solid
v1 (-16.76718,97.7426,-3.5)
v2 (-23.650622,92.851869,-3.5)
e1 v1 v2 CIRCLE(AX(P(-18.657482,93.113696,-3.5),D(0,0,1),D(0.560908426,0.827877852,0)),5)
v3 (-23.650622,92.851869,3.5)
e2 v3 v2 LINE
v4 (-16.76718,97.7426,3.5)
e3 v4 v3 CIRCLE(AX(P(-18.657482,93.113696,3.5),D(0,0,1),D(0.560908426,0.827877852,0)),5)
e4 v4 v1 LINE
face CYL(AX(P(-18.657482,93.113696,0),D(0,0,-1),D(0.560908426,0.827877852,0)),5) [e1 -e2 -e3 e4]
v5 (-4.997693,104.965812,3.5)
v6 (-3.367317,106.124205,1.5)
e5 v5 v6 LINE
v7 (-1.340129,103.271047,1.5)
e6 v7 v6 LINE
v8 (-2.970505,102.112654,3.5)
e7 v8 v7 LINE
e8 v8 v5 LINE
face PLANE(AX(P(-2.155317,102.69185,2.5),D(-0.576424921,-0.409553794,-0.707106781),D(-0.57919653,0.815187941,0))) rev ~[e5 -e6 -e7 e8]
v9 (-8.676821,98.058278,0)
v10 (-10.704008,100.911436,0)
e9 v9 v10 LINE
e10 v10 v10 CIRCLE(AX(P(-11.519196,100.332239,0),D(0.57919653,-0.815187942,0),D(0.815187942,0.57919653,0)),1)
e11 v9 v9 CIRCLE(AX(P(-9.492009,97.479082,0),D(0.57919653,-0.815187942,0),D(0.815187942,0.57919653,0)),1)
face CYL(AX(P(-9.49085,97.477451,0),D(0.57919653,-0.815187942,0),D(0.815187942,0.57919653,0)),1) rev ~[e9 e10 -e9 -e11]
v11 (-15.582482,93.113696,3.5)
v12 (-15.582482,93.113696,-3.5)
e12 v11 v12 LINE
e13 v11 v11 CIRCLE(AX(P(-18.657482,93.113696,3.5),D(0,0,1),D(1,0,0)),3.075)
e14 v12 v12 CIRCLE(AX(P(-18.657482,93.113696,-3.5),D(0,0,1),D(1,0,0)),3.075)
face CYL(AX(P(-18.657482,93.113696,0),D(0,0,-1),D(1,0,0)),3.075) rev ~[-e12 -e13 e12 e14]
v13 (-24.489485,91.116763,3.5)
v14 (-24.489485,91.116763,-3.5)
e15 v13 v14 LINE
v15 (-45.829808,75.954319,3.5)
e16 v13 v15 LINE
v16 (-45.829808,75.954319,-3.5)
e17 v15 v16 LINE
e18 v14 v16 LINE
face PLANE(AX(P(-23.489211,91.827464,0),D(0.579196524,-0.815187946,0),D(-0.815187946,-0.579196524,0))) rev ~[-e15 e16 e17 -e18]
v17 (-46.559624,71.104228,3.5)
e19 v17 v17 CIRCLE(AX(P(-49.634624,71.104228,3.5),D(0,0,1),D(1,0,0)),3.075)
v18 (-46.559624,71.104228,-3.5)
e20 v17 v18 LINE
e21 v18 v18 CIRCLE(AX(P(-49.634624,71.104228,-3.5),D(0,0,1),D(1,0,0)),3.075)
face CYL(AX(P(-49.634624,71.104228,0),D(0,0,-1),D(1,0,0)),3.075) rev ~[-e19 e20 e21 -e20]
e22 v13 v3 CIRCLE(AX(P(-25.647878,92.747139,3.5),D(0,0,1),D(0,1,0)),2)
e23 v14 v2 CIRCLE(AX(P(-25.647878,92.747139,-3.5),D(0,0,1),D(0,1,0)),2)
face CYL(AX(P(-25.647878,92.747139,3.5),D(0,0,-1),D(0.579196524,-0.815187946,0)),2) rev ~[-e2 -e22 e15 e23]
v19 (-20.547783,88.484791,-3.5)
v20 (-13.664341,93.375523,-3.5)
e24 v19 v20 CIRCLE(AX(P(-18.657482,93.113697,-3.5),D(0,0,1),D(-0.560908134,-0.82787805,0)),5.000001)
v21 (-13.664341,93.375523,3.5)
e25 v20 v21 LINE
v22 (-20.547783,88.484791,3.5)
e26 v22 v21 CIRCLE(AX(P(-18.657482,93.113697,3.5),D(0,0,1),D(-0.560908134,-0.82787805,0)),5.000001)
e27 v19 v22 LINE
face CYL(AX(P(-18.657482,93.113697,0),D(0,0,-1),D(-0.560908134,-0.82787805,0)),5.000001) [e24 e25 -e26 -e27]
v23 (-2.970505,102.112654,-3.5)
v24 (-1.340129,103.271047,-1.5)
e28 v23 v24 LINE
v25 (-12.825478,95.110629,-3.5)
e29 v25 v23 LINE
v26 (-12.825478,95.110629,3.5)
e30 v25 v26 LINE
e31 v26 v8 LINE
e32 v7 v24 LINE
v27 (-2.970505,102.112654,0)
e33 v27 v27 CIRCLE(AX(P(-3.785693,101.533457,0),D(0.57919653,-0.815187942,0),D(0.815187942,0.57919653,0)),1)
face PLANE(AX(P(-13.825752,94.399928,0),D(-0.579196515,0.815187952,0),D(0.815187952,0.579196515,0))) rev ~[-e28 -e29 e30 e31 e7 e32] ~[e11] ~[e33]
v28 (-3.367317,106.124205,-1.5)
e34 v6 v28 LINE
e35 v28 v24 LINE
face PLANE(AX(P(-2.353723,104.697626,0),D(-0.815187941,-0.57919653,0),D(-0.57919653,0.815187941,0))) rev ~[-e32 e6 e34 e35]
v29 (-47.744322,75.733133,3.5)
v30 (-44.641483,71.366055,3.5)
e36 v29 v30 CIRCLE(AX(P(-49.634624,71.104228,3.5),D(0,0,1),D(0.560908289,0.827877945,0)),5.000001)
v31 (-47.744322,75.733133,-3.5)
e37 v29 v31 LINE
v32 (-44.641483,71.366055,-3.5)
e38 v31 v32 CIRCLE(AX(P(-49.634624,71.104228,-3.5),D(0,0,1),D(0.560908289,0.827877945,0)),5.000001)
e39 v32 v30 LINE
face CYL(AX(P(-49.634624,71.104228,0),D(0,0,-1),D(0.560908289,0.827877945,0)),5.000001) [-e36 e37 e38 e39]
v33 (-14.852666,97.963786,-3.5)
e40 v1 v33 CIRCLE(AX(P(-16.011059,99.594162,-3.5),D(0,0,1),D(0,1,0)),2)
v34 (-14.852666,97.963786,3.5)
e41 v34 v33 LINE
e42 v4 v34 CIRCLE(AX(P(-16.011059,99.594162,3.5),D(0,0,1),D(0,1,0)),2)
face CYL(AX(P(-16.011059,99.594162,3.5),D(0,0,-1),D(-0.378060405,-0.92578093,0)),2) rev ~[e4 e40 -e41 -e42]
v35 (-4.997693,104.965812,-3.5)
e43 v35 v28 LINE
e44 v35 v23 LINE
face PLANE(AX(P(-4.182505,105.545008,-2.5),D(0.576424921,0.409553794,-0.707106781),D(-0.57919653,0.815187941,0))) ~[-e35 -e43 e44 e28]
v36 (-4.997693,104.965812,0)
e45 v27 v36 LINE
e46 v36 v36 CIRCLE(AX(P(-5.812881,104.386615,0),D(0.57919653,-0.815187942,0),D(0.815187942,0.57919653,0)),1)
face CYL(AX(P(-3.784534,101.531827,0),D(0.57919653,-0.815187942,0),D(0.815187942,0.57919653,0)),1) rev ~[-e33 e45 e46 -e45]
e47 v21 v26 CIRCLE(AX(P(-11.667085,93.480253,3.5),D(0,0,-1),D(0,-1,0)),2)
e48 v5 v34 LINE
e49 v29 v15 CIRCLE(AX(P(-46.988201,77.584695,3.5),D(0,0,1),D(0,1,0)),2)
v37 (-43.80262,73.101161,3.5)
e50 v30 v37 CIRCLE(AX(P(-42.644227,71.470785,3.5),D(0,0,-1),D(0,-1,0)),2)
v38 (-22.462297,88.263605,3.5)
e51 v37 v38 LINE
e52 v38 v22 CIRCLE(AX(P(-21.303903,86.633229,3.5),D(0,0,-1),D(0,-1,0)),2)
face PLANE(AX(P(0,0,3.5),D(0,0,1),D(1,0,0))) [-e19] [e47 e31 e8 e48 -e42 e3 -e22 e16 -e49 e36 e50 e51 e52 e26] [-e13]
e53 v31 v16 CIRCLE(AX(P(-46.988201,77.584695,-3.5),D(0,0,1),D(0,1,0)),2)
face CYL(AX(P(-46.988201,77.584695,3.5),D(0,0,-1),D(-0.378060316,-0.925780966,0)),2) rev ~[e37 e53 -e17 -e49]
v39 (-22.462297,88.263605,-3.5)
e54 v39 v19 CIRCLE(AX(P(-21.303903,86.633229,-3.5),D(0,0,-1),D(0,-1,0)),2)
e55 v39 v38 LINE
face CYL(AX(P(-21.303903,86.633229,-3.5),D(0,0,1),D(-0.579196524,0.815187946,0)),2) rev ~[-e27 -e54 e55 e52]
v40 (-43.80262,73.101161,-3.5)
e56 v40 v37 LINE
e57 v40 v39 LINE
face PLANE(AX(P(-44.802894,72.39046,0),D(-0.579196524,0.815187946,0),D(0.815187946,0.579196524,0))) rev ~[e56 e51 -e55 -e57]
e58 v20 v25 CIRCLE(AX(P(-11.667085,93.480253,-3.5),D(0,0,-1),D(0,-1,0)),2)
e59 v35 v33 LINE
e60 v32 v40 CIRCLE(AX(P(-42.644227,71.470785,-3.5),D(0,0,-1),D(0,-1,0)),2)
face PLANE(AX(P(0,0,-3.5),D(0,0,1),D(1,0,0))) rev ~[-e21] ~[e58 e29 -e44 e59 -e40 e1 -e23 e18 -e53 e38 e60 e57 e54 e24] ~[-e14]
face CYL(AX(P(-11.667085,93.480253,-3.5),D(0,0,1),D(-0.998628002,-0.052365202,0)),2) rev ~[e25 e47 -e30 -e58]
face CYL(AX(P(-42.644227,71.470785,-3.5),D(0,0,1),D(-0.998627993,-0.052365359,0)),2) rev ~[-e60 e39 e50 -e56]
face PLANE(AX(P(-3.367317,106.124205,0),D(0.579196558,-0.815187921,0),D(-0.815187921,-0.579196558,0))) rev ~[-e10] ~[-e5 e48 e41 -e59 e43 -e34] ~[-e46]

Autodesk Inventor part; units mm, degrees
ref_plane "YZ Plane" through (0, 0, 0) normal (1, 0, 0) x (0, 1, 0)
ref_plane "XZ Plane" through (0, 0, 0) normal (0, 1, 0) x (-1, 0, 0)
ref_plane "XY Plane" through (0, 0, 0) normal (0, 0, 1) x (1, 0, 0)
sketch "Sketch1" plane through (0, 0, 0) normal (0, 0, 1) x (1, 0, 0)
  line L0 (-49.634624, 71.104228) -> (-18.657482, 93.113696)
  circle A0 centre (-49.634624, 71.104228) radius 5
  circle A1 centre (-18.657482, 93.113696) radius 5
  circle A2 centre (-49.634624, 71.104228) radius 3.075
  circle A3 centre (-18.657482, 93.113696) radius 3.075
  line L1 (-49.634624, 71.104228) -> (-18.657482, 93.113696) construction
  line L2 (-48.62103, 69.677649) -> (-17.643888, 91.687117)
  line L3 (-19.671076, 94.540275) -> (-50.648218, 72.530807)
  arc A4 (-50.648218, 72.530807) -> (-48.62103, 69.677649) centre (-49.634624, 71.104228) ccw
  arc A5 (-17.643888, 91.687117) -> (-19.671076, 94.540275) centre (-18.657482, 93.113696) ccw
  line L4 (-18.657482, 93.113696) -> (-2.353723, 104.697626) construction
  line L5 (-17.643888, 91.687117) -> (-1.340129, 103.271047)
  line L6 (-3.367317, 106.124205) -> (-19.671076, 94.540275)
  arc A6 (-19.671076, 94.540275) -> (-17.643888, 91.687117) centre (-18.657482, 93.113696) ccw
  arc A7 (-1.340129, 103.271047) -> (-3.367317, 106.124205) centre (-2.353723, 104.697626) ccw
  line L7 (-2.353723, 104.697626) -> (-3.367317, 106.124205)
  line L8 (-2.353723, 104.697626) -> (-1.340129, 103.271047)
  point P0 (0, 0)
  point P1 (-34.146053, 82.108962)
  point P2 (-10.505602, 98.905661)
  point P3 (-44.802894, 72.39046)
  point P4 (-21.462023, 88.974306)
  point P5 (-13.825752, 94.399928)
  point P6 (-15.85294, 97.253085)
  point P7 (-23.489211, 91.827464)
  point P8 (-46.830082, 75.243618)
  dimension "d0" = 10
  dimension "d1" = 10
  dimension "d2" = 6.15
  dimension "d3" = 6.15
  dimension "d4" = 3.5
  dimension "d5" = 20
  dimension "d6" = 3.5
sketch "Sketch1 outline for Extrusion1" plane through (0, 0, 0) normal (0, 0, 1) x (1, 0, 0)
  line L0 (-44.802894, 72.39046) -> (-21.462023, 88.974306)
  arc A0 (-46.830082, 75.243618) -> (-44.802894, 72.39046) centre (-49.634624, 71.104228) ccw
  arc A1 (-21.462023, 88.974306) -> (-13.825752, 94.399928) centre (-18.657482, 93.113696) ccw
  line L1 (-23.489211, 91.827464) -> (-46.830082, 75.243618)
  line L2 (-13.825752, 94.399928) -> (-1.340129, 103.271047)
  arc A2 (-15.85294, 97.253085) -> (-23.489211, 91.827464) centre (-18.657482, 93.113696) ccw
  line L3 (-1.340129, 103.271047) -> (-2.353723, 104.697626)
  line L4 (-3.367317, 106.124205) -> (-15.85294, 97.253085)
  line L5 (-2.353723, 104.697626) -> (-3.367317, 106.124205)
  circle A3 centre (-49.634624, 71.104228) radius 3.075
  circle A4 centre (-18.657482, 93.113696) radius 3.075
extrude "Extrusion1" add sketch "Sketch1 outline for Extrusion1" along normal mid plane 7
sketch "Sketch2" plane through (-1.340129, 103.271047, -3.5) normal (0.5791965, -0.8151879, 0) x (0.8151879, 0.5791965, 0)
  line L0 (0, 0) -> (0, 7)
  line L1 (-15.316252, 7) -> (0, 7)
  line L2 (-15.316252, 0) -> (-15.316252, 7)
  line L3 (0, 0) -> (-15.316252, 0)
  line L4 (0, 0) -> (0, 7)
  line L5 (0, 3.5) -> (-8, 3.5)
  line L6 (-8, 3.5) -> (-3, 3.5)
  circle A0 centre (-3, 3.5) radius 1
  line L7 (-8, 3.5) -> (-10, 3.5)
  circle A1 centre (-10, 3.5) radius 1
  point P0 (-58.721774, 3.5)
  dimension "d9" = 8
  dimension "d10" = 5
  dimension "d11" = 2
  dimension "d12" = 2
  dimension "d13" = 2
sketch "Sketch2 outline for Extrusion2" plane through (-1.340129, 103.271047, -3.5) normal (0.5791965, -0.8151879, 0) x (0.8151879, 0.5791965, 0)
  circle A0 centre (-3, 3.5) radius 1
  circle A1 centre (-10, 3.5) radius 1
extrude "Extrusion2" cut sketch "Sketch2 outline for Extrusion2" against normal blind 5
fillet "Fillet1" radius 2 6 edges at (-46.8301, 75.2436, 0) (-44.8029, 72.3905, 0) (-21.462, 88.9743, 0) (-13.8258, 94.3999, 0) (-15.8529, 97.2531, 0) (-23.4892, 91.8275, 0)
chamfer "Chamfer1" distance 2 angle 45 2 edges at (-2.3537, 104.6976, 3.5) (-2.3537, 104.6976, -3.5)
properties part number "leg_link_1"
